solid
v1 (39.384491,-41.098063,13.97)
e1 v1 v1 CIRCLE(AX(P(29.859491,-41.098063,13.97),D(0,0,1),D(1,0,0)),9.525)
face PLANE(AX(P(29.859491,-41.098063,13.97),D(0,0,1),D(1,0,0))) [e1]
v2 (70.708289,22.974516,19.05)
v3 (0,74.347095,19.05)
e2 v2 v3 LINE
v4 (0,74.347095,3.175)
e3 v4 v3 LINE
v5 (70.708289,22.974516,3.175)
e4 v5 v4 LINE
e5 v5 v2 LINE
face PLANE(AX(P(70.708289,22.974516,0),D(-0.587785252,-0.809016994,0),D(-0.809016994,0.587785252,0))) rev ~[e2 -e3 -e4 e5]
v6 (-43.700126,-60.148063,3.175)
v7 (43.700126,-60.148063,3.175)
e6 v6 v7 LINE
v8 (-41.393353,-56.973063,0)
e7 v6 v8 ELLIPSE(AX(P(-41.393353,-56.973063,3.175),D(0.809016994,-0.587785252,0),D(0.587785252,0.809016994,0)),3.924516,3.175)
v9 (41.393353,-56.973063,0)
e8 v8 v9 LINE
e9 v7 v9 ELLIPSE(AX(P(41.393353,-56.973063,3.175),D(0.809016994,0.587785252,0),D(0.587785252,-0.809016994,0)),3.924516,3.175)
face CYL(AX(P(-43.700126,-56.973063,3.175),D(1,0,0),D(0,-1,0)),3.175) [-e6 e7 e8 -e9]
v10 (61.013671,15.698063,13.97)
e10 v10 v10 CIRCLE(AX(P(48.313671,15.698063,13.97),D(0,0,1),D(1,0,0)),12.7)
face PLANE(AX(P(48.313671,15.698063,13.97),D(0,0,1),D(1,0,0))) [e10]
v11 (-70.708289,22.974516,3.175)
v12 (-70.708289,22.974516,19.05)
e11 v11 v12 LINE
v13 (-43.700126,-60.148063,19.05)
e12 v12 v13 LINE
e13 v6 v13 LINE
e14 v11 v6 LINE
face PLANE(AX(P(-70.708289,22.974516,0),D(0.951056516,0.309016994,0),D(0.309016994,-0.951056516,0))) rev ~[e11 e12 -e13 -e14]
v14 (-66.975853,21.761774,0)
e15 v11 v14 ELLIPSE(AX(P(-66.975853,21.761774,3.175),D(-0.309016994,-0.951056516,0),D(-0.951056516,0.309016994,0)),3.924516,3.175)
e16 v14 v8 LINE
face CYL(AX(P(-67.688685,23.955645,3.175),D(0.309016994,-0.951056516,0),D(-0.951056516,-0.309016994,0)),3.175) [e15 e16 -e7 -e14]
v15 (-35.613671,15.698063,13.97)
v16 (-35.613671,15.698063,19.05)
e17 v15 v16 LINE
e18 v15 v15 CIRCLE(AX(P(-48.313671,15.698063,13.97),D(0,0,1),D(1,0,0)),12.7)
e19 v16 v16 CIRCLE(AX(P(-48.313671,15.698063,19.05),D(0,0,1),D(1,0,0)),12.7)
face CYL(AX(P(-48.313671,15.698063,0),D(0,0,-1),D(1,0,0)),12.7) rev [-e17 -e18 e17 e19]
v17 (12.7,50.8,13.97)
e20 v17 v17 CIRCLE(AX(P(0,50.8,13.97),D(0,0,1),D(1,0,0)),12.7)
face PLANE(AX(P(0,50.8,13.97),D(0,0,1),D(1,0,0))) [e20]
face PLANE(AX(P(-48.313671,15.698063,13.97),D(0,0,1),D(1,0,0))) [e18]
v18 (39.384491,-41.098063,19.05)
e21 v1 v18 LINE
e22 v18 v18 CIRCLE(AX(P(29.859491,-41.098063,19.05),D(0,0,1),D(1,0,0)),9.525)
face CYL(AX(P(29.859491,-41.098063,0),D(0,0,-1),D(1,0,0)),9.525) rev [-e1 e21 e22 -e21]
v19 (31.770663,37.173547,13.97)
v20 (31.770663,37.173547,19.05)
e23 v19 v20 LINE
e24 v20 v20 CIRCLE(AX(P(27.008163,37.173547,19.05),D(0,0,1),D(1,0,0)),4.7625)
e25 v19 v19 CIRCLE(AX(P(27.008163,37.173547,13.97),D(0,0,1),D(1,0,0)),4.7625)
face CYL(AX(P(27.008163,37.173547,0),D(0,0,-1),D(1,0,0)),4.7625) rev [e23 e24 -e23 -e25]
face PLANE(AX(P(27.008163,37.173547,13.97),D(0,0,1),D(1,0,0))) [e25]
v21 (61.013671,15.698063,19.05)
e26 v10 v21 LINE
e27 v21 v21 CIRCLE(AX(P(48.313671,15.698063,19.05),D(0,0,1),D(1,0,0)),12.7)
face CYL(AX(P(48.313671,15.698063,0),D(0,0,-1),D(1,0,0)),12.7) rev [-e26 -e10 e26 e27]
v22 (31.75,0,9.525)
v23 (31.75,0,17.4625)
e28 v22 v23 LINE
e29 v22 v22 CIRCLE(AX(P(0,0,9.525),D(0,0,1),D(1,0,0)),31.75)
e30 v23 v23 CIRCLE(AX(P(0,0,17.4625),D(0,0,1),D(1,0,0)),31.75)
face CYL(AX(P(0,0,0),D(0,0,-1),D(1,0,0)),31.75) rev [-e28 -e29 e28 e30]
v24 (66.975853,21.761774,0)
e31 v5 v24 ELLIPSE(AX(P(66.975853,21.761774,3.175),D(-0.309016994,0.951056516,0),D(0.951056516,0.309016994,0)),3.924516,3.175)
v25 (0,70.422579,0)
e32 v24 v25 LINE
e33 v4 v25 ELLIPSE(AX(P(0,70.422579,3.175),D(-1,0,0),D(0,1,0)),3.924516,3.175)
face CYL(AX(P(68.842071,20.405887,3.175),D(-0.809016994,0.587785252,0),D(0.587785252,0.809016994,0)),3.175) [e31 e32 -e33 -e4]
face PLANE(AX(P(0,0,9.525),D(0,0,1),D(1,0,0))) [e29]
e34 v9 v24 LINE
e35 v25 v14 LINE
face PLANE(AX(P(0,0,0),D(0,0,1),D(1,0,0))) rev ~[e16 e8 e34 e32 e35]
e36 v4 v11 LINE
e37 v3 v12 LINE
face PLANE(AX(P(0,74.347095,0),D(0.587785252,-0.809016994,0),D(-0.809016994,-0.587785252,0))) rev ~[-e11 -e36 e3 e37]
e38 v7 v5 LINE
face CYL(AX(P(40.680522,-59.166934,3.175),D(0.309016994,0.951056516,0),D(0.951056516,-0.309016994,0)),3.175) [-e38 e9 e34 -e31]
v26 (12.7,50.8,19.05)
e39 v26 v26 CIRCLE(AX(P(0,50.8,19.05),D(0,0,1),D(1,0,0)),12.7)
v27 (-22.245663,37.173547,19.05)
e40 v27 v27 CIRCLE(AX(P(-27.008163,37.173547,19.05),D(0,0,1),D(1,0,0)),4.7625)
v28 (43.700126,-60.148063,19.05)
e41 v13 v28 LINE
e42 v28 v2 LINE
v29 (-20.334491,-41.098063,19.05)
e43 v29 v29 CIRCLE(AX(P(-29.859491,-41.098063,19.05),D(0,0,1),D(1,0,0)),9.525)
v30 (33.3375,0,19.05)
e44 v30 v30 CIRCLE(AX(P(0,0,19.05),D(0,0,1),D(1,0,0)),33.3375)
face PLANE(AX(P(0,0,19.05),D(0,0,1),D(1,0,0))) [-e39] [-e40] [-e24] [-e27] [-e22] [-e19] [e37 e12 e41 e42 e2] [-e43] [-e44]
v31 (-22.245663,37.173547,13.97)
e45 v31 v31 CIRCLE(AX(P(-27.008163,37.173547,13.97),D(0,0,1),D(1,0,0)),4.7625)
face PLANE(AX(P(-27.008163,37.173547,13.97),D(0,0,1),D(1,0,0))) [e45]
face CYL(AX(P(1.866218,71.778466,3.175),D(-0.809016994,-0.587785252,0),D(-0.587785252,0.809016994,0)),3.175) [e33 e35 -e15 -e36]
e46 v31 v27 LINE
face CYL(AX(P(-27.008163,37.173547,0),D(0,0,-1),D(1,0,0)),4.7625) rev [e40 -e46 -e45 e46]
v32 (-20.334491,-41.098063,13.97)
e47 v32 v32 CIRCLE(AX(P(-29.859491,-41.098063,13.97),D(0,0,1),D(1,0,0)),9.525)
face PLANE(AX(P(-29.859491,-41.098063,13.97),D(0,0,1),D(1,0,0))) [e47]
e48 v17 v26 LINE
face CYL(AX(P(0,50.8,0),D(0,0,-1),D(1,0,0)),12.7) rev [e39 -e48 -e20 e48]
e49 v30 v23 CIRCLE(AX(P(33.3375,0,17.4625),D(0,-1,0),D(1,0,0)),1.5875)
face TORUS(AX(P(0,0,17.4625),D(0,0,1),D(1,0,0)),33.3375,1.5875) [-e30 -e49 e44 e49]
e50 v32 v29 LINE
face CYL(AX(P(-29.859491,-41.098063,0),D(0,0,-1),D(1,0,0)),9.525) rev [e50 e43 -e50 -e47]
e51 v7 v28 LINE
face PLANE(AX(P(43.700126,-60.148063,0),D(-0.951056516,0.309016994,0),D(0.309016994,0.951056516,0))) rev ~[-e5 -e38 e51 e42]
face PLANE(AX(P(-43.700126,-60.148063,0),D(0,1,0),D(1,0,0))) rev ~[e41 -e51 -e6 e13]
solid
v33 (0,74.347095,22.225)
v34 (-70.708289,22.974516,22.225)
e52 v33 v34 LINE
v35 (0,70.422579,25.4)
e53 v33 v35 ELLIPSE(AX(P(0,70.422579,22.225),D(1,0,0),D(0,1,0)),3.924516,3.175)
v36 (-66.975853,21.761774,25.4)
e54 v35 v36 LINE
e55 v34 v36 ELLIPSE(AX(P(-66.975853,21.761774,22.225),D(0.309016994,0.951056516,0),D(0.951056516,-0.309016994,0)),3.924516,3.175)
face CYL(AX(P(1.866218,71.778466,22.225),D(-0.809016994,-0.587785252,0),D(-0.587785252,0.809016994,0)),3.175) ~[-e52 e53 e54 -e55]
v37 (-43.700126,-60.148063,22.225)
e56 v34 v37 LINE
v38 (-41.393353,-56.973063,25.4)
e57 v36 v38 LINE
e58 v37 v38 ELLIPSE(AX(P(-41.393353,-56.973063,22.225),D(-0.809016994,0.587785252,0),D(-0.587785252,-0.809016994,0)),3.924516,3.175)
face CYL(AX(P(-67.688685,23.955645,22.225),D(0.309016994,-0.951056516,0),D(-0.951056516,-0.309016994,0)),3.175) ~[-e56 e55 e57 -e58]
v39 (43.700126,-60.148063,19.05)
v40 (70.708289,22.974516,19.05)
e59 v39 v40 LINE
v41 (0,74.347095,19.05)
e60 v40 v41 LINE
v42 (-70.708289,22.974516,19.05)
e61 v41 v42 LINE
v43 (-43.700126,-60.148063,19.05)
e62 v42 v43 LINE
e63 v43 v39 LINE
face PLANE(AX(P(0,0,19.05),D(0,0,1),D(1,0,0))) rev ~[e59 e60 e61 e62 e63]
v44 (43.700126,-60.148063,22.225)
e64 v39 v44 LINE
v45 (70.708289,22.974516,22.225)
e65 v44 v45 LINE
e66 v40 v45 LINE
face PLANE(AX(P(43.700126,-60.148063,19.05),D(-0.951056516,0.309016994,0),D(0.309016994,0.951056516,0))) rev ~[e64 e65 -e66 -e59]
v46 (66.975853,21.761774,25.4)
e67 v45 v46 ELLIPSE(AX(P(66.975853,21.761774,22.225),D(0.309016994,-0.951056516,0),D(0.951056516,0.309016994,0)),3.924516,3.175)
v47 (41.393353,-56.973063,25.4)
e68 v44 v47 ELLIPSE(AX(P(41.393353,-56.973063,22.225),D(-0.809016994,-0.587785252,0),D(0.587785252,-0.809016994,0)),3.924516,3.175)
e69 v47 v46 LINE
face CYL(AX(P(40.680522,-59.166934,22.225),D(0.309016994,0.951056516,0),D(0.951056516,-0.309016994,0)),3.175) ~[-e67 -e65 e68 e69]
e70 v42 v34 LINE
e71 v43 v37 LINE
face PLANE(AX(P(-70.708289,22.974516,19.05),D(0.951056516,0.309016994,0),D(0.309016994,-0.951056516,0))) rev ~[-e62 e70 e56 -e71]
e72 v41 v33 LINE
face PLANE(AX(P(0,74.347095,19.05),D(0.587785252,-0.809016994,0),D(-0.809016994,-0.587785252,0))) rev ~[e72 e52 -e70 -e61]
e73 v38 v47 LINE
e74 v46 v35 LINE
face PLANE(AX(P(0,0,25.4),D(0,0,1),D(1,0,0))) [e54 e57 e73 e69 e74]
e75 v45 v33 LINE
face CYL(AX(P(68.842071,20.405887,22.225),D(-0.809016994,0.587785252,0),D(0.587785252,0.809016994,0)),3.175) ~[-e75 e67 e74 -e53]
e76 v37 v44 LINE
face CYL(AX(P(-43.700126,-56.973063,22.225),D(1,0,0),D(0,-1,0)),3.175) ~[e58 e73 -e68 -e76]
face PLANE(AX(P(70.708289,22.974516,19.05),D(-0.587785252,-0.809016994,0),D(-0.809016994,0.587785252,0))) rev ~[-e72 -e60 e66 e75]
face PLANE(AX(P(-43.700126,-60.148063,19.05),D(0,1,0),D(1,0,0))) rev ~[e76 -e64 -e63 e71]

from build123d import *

# Parameters (mm, degrees)
F0_R     = 9.525
F0_R_2   = 31.75
F0_R_3   = 12.7
F0_R_4   = 4.7625
F1_DEPTH = 19.05
F2_DEPTH = 13.97
F3_DEPTH = 9.525
F4_R     = 1.5875
F5_R     = 3.175
F7_DEPTH = 6.35
F8_R     = 3.175


# Not quite as in the source:
# - a feature names something its author has since deleted; it is built from what else it names


with BuildPart() as f1:
    # F0 (on Top) → F1 (new body)
    with BuildSketch(Plane.XY):
        Polygon((-43.700125975, -60.1480633142), (43.700125975, -60.1480633142), (70.7082891401, 22.9745158286), (0, 74.3470949714), (-70.7082891401, 22.9745158286), align=None)
        with Locations((-29.8594908165, -41.0980633142)):
            Circle(F0_R, mode=Mode.SUBTRACT)
        with Locations((29.8594908165, -41.0980633142)):
            Circle(F0_R, mode=Mode.SUBTRACT)
        Circle(F0_R_2, mode=Mode.SUBTRACT)
        with Locations((-48.3136710278, 15.6980633142)):
            Circle(F0_R_3, mode=Mode.SUBTRACT)
        with Locations((-27.0081631652, 37.1735474857)):
            Circle(F0_R_4, mode=Mode.SUBTRACT)
        with Locations((27.0081631652, 37.1735474857)):
            Circle(F0_R_4, mode=Mode.SUBTRACT)
        with Locations((48.3136710278, 15.6980633142)):
            Circle(F0_R_3, mode=Mode.SUBTRACT)
        with Locations((0, 50.8)):
            Circle(F0_R_3, mode=Mode.SUBTRACT)
    extrude(amount=F1_DEPTH)

    # F0 (on Top) → F2 (join)
    with BuildSketch(Plane.XY):
        with Locations((-48.3136710278, 15.6980633142)):
            Circle(F0_R_3)
        with Locations((0, 50.8)):
            Circle(F0_R_3)
        with Locations((48.3136710278, 15.6980633142)):
            Circle(F0_R_3)
        with Locations((29.8594908165, -41.0980633142)):
            Circle(F0_R)
        with Locations((-29.8594908165, -41.0980633142)):
            Circle(F0_R)
        with Locations((-27.0081631652, 37.1735474857)):
            Circle(F0_R_4)
        with Locations((27.0081631652, 37.1735474857)):
            Circle(F0_R_4)
    extrude(amount=F2_DEPTH)

    # F0 (on Top) → F3 (join)
    with BuildSketch(Plane.XY):
        Circle(F0_R_2)
    extrude(amount=F3_DEPTH)

    # F4
    f4_edges = [f1.edges().sort_by_distance(p)[0] for p in [
        (-31.75, 0, 19.05),
    ]]
    fillet(f4_edges, radius=F4_R)

    # F5
    f5_edges = [f1.edges().sort_by_distance(p)[0] for p in [
        (0, -60.148063, 0),
        (57.204208, -18.586774, 0),
        (35.354145, 48.660805, 0),
        (-35.354145, 48.660805, 0),
        (-57.204208, -18.586774, 0),
    ]]
    fillet(f5_edges, radius=F5_R)


with BuildPart() as f7:
    # F6 (on face) → F7 (new body)
    with BuildSketch(Plane.XY.offset(19.05)):
        Polygon((-70.7082891401, 22.9745158286), (-43.700125975, -60.1480633142), (43.700125975, -60.1480633142), (70.7082891401, 22.9745158286), (0, 74.3470949714), align=None)
    extrude(amount=F7_DEPTH)

    # F8
    f8_edges = [f7.edges().sort_by_distance(p)[0] for p in [
        (-57.204208, -18.586774, 25.4),
        (0, -60.148063, 25.4),
        (57.204208, -18.586774, 25.4),
        (35.354145, 48.660805, 25.4),
        (-35.354145, 48.660805, 25.4),
    ]]
    fillet(f8_edges, radius=F8_R)


solid = Compound([f1.part, f7.part])
